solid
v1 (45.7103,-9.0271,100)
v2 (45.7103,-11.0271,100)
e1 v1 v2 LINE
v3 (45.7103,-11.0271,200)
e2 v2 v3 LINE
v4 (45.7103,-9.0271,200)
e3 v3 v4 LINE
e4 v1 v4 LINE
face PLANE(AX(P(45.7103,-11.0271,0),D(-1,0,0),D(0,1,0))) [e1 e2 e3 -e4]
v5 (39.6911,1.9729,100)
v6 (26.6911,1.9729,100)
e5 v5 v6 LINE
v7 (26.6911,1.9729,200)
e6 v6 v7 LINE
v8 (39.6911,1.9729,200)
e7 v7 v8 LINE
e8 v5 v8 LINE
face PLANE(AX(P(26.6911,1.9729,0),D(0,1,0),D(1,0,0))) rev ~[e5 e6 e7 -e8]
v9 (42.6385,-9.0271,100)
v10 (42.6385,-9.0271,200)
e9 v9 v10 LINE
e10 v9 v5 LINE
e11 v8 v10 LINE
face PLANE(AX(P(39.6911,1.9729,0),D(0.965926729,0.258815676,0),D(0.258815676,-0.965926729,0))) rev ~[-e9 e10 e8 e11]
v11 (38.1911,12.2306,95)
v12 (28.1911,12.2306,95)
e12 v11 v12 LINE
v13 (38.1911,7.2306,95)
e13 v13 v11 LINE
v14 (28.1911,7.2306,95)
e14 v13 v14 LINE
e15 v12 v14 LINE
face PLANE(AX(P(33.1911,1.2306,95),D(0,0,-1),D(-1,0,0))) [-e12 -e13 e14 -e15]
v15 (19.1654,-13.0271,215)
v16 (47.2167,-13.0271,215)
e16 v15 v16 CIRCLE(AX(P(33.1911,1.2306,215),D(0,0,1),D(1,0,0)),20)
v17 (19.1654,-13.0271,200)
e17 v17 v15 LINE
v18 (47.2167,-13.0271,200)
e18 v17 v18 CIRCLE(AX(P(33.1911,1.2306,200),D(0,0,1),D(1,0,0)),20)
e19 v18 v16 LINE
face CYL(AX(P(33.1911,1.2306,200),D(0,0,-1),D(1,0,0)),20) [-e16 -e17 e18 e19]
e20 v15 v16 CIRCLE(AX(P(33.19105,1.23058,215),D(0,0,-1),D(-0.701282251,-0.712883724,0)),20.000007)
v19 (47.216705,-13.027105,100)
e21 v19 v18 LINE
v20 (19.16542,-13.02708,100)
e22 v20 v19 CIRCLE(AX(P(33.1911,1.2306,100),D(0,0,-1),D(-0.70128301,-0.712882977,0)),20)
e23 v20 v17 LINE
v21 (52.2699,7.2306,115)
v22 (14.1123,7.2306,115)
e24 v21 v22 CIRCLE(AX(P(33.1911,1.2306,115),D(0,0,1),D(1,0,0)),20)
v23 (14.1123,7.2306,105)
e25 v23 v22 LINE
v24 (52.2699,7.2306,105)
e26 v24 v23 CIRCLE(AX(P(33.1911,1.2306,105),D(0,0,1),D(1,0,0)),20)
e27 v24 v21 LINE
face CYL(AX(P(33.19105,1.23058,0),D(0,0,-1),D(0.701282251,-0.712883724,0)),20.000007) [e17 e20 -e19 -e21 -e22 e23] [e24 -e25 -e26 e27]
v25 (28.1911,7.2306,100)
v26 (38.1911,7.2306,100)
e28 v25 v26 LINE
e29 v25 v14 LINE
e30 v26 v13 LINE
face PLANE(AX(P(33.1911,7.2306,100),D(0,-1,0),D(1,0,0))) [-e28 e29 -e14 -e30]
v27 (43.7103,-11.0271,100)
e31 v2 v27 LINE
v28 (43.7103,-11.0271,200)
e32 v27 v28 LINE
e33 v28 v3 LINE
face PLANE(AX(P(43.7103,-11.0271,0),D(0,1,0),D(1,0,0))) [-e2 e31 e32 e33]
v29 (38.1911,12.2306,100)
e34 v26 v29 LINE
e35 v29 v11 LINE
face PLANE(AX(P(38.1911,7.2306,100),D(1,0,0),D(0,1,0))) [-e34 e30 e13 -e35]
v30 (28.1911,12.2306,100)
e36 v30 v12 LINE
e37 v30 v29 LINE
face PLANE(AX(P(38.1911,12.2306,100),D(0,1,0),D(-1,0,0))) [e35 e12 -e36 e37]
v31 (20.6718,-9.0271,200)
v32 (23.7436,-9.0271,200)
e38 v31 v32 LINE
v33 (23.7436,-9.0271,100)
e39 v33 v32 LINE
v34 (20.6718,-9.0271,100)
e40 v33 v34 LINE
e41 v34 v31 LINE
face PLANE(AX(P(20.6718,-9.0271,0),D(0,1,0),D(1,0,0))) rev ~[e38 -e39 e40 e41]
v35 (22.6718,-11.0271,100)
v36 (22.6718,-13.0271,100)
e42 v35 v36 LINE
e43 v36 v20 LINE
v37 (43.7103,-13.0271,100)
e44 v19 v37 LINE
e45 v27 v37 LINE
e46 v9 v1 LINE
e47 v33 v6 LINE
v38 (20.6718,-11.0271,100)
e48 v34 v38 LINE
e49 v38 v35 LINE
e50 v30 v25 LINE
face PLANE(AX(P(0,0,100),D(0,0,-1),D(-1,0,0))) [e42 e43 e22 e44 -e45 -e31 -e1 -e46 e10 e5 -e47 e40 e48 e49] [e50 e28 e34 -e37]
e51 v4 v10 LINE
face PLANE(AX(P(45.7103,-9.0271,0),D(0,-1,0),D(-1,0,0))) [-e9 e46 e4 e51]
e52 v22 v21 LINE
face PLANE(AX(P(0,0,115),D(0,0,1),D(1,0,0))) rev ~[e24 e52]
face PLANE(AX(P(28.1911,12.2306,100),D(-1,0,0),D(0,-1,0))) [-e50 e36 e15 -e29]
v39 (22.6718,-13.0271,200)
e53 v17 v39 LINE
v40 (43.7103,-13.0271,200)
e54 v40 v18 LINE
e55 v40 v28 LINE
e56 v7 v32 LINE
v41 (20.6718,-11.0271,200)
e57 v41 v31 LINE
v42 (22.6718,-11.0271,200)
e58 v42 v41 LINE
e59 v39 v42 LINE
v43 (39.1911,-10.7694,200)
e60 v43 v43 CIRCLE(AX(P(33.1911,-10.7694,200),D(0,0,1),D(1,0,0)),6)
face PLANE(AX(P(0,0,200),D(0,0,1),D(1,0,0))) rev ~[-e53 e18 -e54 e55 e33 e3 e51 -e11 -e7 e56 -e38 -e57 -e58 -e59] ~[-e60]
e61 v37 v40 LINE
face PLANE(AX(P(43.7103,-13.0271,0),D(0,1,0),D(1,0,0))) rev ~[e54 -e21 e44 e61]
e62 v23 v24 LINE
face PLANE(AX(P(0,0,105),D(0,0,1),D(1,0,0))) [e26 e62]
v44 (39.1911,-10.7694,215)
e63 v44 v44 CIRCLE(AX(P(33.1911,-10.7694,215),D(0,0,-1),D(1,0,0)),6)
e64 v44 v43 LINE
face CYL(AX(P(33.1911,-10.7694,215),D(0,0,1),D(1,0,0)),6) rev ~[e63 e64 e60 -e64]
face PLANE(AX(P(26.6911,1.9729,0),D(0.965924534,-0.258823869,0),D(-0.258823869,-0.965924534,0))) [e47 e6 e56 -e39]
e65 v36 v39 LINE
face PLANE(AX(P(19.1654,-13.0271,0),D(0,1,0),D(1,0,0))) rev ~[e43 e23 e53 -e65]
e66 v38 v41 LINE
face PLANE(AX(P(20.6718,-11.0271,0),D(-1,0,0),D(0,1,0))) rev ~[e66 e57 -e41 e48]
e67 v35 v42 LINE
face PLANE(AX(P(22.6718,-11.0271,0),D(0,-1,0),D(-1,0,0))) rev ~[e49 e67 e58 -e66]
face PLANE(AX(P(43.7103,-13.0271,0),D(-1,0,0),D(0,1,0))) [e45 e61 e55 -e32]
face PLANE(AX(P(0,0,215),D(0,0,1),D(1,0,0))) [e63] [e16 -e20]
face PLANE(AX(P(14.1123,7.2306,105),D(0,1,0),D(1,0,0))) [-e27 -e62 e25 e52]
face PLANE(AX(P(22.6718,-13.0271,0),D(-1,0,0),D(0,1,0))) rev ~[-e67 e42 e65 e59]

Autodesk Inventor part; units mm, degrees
ref_plane "YZ Plane" through (0, 0, 0) normal (1, 0, 0) x (0, 1, 0)
ref_plane "XZ Plane" through (0, 0, 0) normal (0, 1, 0) x (-1, 0, 0)
ref_plane "XY Plane" through (0, 0, 0) normal (0, 0, 1) x (1, 0, 0)
sketch "Эскиз1" plane through (0, 0, 0) normal (0, 0, 1) x (1, 0, 0)
  arc A0 (47.2167, -13.0271) -> (19.1654, -13.0271) centre (33.1911, 1.2306) ccw
  line L0 (26.6911, 1.9729) -> (39.6911, 1.9729)
  line L1 (39.6911, 1.9729) -> (42.6385, -9.0271)
  line L2 (33.1911, 1.9729) -> (33.1911, -13.0271) construction
  line L3 (26.6911, 1.9729) -> (23.7436, -9.0271)
  line L4 (22.6718, -13.0271) -> (22.6718, -11.0271)
  line L5 (22.6718, -11.0271) -> (20.6718, -11.0271)
  line L6 (20.6718, -11.0271) -> (20.6718, -9.0271)
  line L7 (20.6718, -9.0271) -> (23.7436, -9.0271)
  line L8 (43.7103, -13.0271) -> (43.7103, -11.0271)
  line L9 (43.7103, -11.0271) -> (45.7103, -11.0271)
  line L10 (45.7103, -11.0271) -> (45.7103, -9.0271)
  line L11 (45.7103, -9.0271) -> (42.6385, -9.0271)
  line L12 (19.1654, -13.0271) -> (22.6718, -13.0271)
  line L13 (43.7103, -13.0271) -> (47.2167, -13.0271)
  point P0 (19.1654, -13.0271)
  dimension "d3" = 13
  dimension "d4" = 105
  dimension "d5" = 15
  dimension "d6" = 40
  dimension "d44" = 2
  dimension "d45" = 2
  dimension "d46" = 2
  dimension "d47" = 3.5064
extrude "Выдавливание1" add sketch "Эскиз1" along normal blind 200
ref_plane "РабПлоскость2" through (0, 0, 105) normal (0, 0, 1) x (1, 0, 0)
ref_plane "РабПлоскость1" through (0, 0, 100) normal (0, 0, 1) x (1, 0, 0)
sketch "Эскиз3" plane through (0, 0, 200) normal (0, 0, 1) x (1, 0, 0)
  arc A0 (47.2167, -13.0271) -> (19.1654, -13.0271) centre (33.1911, 1.2306) ccw projected
  circle A1 centre (33.1911, 1.2306) radius 20
  point P0 (0, 0)
  point P1 (19.1654, -13.0271)
extrude "Выдавливание3" add sketch "Эскиз3" along normal blind 15
sketch "Эскиз5" plane through (33.1911, 1.2306, 215) normal (0, 0, 1) x (1, 0, 0)
  circle A0 centre (0, -12) radius 6
  circle A1 centre (0, 0) radius 20 construction
  circle A2 centre (0, 0) radius 18 construction
  circle A3 centre (0, 0) radius 20 construction
  line L0 (0, -20) -> (0, 0)
  point P0 (-33.1911, -1.2306)
  dimension "d38" = 12
  dimension "d39" = 2
extrude "Выдавливание5" cut sketch "Эскиз5" against normal blind 15
sketch "Эскиз13" plane through (0, 0, 105) normal (0, 0, 1) x (1, 0, 0)
  circle A0 centre (33.1911, 1.2306) radius 20 projected
  circle A1 centre (33.1911, 1.2306) radius 20
  line L0 (14.1123, 7.2306) -> (52.2699, 7.2306)
  point P0 (0, 0)
  dimension "d79" = 6
extrude "Выдавливание12" cut sketch "Эскиз13" along normal blind 10 contours L0 A0 picked at (30.9346, 14.3004)
sketch "Эскиз14" plane through (0, 0, 0) normal (0, 0, -1) x (-1, 0, 0)
  arc A0 (-14.1123, 7.2306) -> (-52.2699, 7.2306) centre (-33.1911, 1.2306) ccw projected
  circle A1 centre (-33.1911, 1.2306) radius 20
  point P0 (0, 0)
  point P1 (-52.2699, 7.2306)
extrude "Выдавливание13" cut sketch "Эскиз14" against normal up to surface (100 mm away)
sketch "Эскиз15" plane through (33.1911, 1.2306, 100) normal (0, 0, -1) x (-1, 0, 0)
  line L0 (-5, 11) -> (5, 11)
  line L1 (5, 11) -> (5, 6)
  line L2 (5, 6) -> (-5, 6)
  line L3 (-5, 6) -> (-5, 11)
  arc A0 (19.0788, 6) -> (-19.0788, 6) centre (0, 0) ccw projected
  line L4 (0, 0) -> (0, 22.3404)
  point P0 (33.1911, -1.2306)
  point P1 (0, 11)
  dimension "d84" = 10
  dimension "d85" = 5
  dimension "d86" = 6
extrude "Выдавливание14" add sketch "Эскиз15" along normal blind 5
properties part number "lamp2"
